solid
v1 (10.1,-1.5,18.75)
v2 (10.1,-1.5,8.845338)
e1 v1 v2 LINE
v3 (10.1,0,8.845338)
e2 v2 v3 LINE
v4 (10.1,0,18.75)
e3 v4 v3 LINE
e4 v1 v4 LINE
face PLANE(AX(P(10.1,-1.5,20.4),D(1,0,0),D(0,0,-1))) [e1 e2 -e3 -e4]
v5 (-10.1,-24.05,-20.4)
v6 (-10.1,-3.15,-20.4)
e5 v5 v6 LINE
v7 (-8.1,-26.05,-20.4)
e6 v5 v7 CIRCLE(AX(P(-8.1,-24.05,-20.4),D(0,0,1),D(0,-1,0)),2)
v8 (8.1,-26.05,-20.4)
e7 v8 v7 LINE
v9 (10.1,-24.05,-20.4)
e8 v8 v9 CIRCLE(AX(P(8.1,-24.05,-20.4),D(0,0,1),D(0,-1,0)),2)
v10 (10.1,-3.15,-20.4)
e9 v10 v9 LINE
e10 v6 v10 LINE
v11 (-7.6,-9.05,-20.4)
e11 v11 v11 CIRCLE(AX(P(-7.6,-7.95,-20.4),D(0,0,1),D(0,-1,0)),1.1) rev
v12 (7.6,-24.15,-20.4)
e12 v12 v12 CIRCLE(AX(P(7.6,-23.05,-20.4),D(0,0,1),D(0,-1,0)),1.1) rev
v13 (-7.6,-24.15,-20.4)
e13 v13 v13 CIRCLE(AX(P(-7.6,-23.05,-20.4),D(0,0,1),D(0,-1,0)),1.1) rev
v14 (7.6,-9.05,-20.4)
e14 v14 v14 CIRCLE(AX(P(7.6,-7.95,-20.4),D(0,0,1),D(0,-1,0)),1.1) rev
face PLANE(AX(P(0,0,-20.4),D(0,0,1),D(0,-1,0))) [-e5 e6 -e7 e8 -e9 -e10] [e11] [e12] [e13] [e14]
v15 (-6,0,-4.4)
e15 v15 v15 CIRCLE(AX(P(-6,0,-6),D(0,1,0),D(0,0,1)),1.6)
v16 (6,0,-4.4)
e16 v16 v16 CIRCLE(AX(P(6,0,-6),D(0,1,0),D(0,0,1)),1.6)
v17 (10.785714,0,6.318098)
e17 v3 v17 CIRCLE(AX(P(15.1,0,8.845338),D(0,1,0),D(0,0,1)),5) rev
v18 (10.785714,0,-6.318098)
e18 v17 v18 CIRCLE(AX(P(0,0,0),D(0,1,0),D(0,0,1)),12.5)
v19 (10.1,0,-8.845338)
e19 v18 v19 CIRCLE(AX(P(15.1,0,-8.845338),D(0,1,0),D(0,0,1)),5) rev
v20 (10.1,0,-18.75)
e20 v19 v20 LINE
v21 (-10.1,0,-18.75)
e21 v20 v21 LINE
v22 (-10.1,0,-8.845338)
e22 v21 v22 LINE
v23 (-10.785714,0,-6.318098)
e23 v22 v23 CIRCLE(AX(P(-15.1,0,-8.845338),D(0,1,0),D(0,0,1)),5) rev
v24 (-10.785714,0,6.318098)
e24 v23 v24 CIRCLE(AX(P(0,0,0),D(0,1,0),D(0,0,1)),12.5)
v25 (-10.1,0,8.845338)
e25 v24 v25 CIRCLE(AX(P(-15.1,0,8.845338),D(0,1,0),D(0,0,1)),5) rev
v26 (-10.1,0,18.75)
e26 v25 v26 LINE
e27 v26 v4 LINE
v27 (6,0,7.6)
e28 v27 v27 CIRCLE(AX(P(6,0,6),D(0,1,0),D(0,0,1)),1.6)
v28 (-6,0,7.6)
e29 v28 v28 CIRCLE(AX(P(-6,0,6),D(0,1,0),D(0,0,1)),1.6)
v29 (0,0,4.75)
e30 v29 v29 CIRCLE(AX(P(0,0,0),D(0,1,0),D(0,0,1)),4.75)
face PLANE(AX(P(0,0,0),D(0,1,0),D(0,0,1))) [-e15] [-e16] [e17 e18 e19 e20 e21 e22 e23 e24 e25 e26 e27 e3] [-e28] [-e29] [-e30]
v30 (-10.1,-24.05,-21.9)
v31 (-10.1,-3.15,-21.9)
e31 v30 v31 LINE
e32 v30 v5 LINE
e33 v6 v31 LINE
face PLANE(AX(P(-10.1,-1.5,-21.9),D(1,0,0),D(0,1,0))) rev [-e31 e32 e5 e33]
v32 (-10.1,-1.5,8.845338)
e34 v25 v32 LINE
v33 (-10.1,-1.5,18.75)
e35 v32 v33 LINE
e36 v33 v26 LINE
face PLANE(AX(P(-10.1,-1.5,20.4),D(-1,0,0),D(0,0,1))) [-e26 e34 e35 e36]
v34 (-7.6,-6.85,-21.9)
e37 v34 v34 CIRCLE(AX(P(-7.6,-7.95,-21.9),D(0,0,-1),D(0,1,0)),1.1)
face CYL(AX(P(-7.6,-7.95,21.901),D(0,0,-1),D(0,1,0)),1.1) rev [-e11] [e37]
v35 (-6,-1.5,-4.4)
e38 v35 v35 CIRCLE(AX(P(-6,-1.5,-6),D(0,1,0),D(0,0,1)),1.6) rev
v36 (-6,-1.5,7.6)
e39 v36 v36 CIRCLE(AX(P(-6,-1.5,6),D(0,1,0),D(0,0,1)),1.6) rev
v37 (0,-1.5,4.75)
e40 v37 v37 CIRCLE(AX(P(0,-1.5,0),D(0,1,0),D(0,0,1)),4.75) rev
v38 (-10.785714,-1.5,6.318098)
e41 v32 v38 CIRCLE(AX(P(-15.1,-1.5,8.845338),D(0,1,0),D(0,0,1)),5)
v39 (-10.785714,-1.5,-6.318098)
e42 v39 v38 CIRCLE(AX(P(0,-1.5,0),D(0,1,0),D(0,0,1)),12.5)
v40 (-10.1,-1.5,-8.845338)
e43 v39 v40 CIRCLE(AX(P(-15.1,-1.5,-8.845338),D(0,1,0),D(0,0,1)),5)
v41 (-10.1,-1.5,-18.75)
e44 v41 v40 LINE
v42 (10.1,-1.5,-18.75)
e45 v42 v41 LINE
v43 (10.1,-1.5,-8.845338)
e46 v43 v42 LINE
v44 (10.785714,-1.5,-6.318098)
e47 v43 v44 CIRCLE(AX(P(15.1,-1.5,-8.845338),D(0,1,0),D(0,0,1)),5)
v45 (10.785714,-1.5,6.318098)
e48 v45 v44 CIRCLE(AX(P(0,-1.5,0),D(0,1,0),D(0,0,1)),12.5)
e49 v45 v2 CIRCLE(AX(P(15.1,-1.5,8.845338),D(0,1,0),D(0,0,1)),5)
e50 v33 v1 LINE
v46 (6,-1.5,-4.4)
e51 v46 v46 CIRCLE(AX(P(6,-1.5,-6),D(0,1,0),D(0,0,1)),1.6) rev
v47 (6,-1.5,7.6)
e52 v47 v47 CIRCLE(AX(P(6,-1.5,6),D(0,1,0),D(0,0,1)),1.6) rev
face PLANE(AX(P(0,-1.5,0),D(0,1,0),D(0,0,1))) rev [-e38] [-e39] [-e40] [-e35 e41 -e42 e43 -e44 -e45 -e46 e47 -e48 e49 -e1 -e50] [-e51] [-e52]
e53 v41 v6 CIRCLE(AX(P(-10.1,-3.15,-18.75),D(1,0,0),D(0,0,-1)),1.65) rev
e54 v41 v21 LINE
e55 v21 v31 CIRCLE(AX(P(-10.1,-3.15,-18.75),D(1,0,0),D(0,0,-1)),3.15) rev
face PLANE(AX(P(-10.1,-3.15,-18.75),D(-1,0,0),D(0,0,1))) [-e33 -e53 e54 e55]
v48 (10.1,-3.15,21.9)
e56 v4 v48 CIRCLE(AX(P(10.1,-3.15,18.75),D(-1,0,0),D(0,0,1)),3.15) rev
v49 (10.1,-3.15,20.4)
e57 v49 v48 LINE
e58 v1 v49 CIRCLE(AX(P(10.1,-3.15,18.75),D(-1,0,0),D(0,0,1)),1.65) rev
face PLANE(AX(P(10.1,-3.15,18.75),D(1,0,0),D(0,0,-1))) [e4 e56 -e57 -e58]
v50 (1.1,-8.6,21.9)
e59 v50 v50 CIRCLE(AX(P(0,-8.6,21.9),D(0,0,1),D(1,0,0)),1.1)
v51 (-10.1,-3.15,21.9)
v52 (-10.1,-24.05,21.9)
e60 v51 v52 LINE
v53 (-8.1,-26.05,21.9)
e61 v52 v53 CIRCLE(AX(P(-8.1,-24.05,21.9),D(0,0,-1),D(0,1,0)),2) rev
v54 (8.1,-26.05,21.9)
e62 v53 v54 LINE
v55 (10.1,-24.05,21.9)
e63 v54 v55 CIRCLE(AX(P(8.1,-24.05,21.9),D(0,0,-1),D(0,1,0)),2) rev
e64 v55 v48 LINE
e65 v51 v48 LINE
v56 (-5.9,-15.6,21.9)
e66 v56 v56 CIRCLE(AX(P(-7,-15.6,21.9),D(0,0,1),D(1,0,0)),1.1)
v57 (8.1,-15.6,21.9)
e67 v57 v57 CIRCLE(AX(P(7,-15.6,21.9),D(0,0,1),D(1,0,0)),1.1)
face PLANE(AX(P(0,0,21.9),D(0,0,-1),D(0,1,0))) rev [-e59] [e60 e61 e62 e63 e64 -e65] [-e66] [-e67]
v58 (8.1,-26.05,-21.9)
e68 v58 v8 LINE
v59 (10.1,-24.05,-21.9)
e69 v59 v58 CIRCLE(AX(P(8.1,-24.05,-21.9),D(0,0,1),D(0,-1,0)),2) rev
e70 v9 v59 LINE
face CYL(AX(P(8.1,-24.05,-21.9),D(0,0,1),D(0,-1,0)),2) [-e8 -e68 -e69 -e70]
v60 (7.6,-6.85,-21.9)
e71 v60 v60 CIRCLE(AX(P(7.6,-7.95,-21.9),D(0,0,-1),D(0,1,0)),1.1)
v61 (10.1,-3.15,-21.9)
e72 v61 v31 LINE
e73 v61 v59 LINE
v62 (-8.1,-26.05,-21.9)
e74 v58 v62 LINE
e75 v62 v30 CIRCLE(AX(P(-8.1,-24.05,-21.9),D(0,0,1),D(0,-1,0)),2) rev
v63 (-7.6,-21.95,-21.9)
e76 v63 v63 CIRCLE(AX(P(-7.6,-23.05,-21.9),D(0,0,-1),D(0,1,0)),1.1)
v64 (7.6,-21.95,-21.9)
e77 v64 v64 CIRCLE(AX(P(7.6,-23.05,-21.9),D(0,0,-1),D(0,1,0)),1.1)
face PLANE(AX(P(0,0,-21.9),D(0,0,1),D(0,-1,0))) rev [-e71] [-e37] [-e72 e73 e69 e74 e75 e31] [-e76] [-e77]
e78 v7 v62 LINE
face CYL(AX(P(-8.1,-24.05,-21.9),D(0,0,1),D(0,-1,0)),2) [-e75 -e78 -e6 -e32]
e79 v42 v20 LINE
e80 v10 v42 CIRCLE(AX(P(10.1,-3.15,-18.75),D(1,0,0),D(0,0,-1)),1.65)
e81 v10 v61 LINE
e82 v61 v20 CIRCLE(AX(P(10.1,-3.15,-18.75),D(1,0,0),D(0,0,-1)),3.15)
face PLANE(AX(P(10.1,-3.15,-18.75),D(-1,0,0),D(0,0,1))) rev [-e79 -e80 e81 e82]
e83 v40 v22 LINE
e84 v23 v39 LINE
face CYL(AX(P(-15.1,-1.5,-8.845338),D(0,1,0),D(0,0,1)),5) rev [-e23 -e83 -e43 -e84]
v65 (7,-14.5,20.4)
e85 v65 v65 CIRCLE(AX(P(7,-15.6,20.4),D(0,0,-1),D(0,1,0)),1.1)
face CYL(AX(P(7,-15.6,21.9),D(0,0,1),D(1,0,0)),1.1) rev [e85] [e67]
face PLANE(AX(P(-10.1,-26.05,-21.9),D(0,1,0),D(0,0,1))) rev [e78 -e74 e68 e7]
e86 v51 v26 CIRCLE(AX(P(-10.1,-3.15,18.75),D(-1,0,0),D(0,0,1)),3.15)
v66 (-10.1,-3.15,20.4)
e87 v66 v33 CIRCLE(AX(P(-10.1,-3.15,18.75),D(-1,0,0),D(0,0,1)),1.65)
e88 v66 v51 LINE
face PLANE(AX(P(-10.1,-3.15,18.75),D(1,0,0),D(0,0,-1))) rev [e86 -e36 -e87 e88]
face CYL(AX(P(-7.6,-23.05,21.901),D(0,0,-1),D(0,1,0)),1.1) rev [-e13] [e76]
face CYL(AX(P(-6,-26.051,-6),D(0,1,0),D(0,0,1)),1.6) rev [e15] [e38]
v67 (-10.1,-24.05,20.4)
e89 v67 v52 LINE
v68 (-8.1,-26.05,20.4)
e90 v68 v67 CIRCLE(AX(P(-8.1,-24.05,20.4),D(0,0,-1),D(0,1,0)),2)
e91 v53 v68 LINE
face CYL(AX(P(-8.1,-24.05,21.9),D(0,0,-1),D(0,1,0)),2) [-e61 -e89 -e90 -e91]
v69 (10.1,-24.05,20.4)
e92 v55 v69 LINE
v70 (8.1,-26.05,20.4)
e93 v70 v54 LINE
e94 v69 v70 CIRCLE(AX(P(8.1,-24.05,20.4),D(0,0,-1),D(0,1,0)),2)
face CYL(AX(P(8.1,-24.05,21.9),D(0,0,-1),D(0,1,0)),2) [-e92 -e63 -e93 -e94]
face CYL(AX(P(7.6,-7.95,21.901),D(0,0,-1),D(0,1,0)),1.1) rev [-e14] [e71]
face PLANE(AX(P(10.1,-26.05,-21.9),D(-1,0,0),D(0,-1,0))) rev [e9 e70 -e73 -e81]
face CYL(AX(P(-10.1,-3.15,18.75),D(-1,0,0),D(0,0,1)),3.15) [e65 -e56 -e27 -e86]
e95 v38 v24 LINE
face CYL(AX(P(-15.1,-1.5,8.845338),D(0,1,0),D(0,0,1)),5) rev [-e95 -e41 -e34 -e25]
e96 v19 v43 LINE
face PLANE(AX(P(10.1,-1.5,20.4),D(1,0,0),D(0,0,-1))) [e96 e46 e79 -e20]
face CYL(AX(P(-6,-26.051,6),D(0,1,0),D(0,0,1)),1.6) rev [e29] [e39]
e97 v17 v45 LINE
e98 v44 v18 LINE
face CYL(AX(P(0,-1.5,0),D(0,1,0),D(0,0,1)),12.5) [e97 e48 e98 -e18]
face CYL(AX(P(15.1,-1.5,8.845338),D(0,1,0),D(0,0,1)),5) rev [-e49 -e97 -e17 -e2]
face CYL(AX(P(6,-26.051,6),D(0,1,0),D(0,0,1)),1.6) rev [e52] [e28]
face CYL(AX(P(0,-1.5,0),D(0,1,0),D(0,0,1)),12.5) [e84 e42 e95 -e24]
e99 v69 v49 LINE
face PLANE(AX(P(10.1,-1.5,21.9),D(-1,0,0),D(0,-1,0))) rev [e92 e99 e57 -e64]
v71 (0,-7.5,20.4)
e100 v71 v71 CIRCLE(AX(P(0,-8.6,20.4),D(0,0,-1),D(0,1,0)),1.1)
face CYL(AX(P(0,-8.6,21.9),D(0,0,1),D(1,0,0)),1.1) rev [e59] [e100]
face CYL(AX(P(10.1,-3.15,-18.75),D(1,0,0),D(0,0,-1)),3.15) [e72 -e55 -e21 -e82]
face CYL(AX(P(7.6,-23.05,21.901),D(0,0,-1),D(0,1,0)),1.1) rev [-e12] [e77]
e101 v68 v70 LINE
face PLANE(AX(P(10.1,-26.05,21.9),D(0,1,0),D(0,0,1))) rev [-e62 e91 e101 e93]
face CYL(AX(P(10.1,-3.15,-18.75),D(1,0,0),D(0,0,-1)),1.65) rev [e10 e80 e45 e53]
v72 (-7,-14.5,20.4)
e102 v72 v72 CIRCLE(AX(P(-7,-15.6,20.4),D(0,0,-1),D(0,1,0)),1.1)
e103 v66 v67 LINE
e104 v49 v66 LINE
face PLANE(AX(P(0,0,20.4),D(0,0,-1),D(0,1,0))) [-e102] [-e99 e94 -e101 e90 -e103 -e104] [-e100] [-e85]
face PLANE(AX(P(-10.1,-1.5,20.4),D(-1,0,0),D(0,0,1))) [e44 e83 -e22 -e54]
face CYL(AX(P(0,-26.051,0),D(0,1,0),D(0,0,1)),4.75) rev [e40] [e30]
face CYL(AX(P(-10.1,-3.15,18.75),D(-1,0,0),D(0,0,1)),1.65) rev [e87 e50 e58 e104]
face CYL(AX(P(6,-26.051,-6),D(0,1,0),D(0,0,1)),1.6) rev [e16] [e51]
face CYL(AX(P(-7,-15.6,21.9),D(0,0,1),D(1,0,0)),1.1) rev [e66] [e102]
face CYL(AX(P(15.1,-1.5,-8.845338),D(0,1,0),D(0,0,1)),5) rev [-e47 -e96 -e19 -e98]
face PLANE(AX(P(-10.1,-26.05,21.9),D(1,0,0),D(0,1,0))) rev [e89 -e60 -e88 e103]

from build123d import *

# Parameters (mm, degrees)
SKETCH1_W                      = 20.2
SKETCH1_H                      = 40.8
BASE_FLANGE1_DEPTH             = 1.5
EDGE_FLANGE1_STRIP_W           = 9.3
EDGE_FLANGE1_STRIP_H           = 1.5
EDGE_FLANGE1_STRIP_CUT_DEPTH   = 20.2
EDGE_FLANGE1_STRIP_2_W         = 9.3
EDGE_FLANGE1_STRIP_2_H         = 1.5
EDGE_FLANGE1_STRIP_CUT_2_DEPTH = 20.2
EDGE_FLANGE1_DEPTH             = 20.2
EDGE_FLANGE1_BEND_DEPTH        = 20.2
CUT_EXTRUDE1_REACH             = 53.952
SKETCH12_R                     = 1.1
FILLET1_R                      = 2
F_2_0MM_DOWEL_HOLE1_D          = 2.2
F_2_0MM_DOWEL_HOLE1_DEPTH      = 1.5
SKETCH15_R                     = 12.5
TAB1_DEPTH                     = 1.5
FILLET2_R                      = 5
CUT_EXTRUDE2_REACH             = 38.256
SKETCH18_R                     = 1.6
SKETCH18_R_2                   = 4.75


# Sheet-metal steps are written as plain solids
with BuildPart() as part:
    # Sketch1 → Base-Flange1 (new body)
    with BuildSketch(Plane(origin=(0, 0, 0), x_dir=(1, 0, 0), z_dir=(0, 1, 0))):
        Rectangle(SKETCH1_W, SKETCH1_H)
    extrude(amount=-BASE_FLANGE1_DEPTH)

    # Edge-Flange1 strip (across the edge) → Edge-Flange1 strip cut (cut)
    with BuildSketch(Plane(origin=(10.1, -1.5, 20.4), x_dir=(0, 0, -1), z_dir=(-1, 0, 0))):
        with Locations((-3, -0.75)):
            Rectangle(EDGE_FLANGE1_STRIP_W, EDGE_FLANGE1_STRIP_H)
    extrude(amount=EDGE_FLANGE1_STRIP_CUT_DEPTH, mode=Mode.SUBTRACT)

    # Edge-Flange1 strip 2 (across the edge) → Edge-Flange1 strip cut 2 (cut)
    with BuildSketch(Plane(origin=(-10.1, -1.5, -20.4), x_dir=(0, 0, 1), z_dir=(1, 0, 0))):
        with Locations((-3, -0.75)):
            Rectangle(EDGE_FLANGE1_STRIP_2_W, EDGE_FLANGE1_STRIP_2_H)
    extrude(amount=EDGE_FLANGE1_STRIP_CUT_2_DEPTH, mode=Mode.SUBTRACT)

    # Edge-Flange1 section (across the edge) → Edge-Flange1 (add)
    with BuildSketch(Plane(origin=(10.1, -1.5, 20.4), x_dir=(0, 0, -1), z_dir=(-1, 0, 0))):
        with BuildLine():
            Line((-1.5, 1.65), (-1.5, 24.55))
            Line((-1.5, 24.55), (0, 24.55))
            Line((0, 24.55), (0, 1.65))
            ThreePointArc((0, 1.65), (0.483273811, 0.483273811), (1.65, 0))
            Line((1.65, 0), (1.65, -1.5))
            ThreePointArc((1.65, -1.5), (-0.577386361, -0.577386361), (-1.5, 1.65))
        make_face()
    extrude(amount=EDGE_FLANGE1_DEPTH)

    # Edge-Flange1 section 2 (across the edge) → Edge-Flange1 bend (add)
    with BuildSketch(Plane(origin=(-10.1, -1.5, -20.4), x_dir=(0, 0, 1), z_dir=(1, 0, 0))):
        with BuildLine():
            Line((-1.5, 1.65), (-1.5, 24.55))
            Line((-1.5, 24.55), (0, 24.55))
            Line((0, 24.55), (0, 1.65))
            ThreePointArc((0, 1.65), (0.483273811, 0.483273811), (1.65, 0))
            Line((1.65, 0), (1.65, -1.5))
            ThreePointArc((1.65, -1.5), (-0.577386361, -0.577386361), (-1.5, 1.65))
        make_face()
    extrude(amount=EDGE_FLANGE1_BEND_DEPTH)

    # Sketch12 → Cut-Extrude1 (cut, up to next)
    with BuildSketch(Plane(origin=(0, 0, -21.9), x_dir=(-1, 0, 0), z_dir=(0, 0, -1)), mode=Mode.PRIVATE) as cut_extrude1_sk1:
        with Locations(Location((-7.6, -7.95, 0), (0, 0, 90))):
            Circle(SKETCH12_R)
    cut_extrude1_tool1 = extrude(cut_extrude1_sk1.sketch, amount=-CUT_EXTRUDE1_REACH, mode=Mode.PRIVATE) & part.part
    # Sketch12 → Cut-Extrude1 (cut, up to next)
    with BuildSketch(Plane(origin=(0, 0, -21.9), x_dir=(-1, 0, 0), z_dir=(0, 0, -1)), mode=Mode.PRIVATE) as cut_extrude1_sk2:
        with Locations(Location((7.6, -7.95, 0), (0, 0, 90))):
            Circle(SKETCH12_R)
    cut_extrude1_tool2 = extrude(cut_extrude1_sk2.sketch, amount=-CUT_EXTRUDE1_REACH, mode=Mode.PRIVATE) & part.part
    # Sketch12 → Cut-Extrude1 (cut, up to next)
    with BuildSketch(Plane(origin=(0, 0, -21.9), x_dir=(-1, 0, 0), z_dir=(0, 0, -1)), mode=Mode.PRIVATE) as cut_extrude1_sk3:
        with Locations(Location((7.6, -23.05, 0), (0, 0, 90))):
            Circle(SKETCH12_R)
    cut_extrude1_tool3 = extrude(cut_extrude1_sk3.sketch, amount=-CUT_EXTRUDE1_REACH, mode=Mode.PRIVATE) & part.part
    # Sketch12 → Cut-Extrude1 (cut, up to next)
    with BuildSketch(Plane(origin=(0, 0, -21.9), x_dir=(-1, 0, 0), z_dir=(0, 0, -1)), mode=Mode.PRIVATE) as cut_extrude1_sk4:
        with Locations(Location((-7.6, -23.05, 0), (0, 0, 90))):
            Circle(SKETCH12_R)
    cut_extrude1_tool4 = extrude(cut_extrude1_sk4.sketch, amount=-CUT_EXTRUDE1_REACH, mode=Mode.PRIVATE) & part.part
    add(cut_extrude1_tool1.solids().sort_by_distance((7.6, -7.95, -21.9))[0], mode=Mode.SUBTRACT)
    add(cut_extrude1_tool2.solids().sort_by_distance((-7.6, -7.95, -21.9))[0], mode=Mode.SUBTRACT)
    add(cut_extrude1_tool3.solids().sort_by_distance((-7.6, -23.05, -21.9))[0], mode=Mode.SUBTRACT)
    add(cut_extrude1_tool4.solids().sort_by_distance((7.6, -23.05, -21.9))[0], mode=Mode.SUBTRACT)

    # Fillet1
    fillet1_edges = [part.edges().sort_by_distance(p)[0] for p in [
        (10.1, -26.05, 21.15),
        (-10.1, -26.05, 21.15),
        (-10.1, -26.05, -21.15),
        (10.1, -26.05, -21.15),
    ]]
    fillet(fillet1_edges, radius=FILLET1_R)

    # Ø2.0mm Dowel Hole1
    with Locations(Plane.XY.offset(21.9)):
        with Locations((-7, -15.6), (0, -8.6), (7, -15.6)):
            Hole(F_2_0MM_DOWEL_HOLE1_D / 2, depth=F_2_0MM_DOWEL_HOLE1_DEPTH)

    # Sketch15 → Tab1 (add)
    with BuildSketch(Plane(origin=(0, 0, 0), x_dir=(1, 0, 0), z_dir=(0, 1, 0))):
        Circle(SKETCH15_R)
    extrude(amount=-TAB1_DEPTH)

    # Fillet2
    fillet2_edges = [part.edges().sort_by_distance(p)[0] for p in [
        (-10.1, -0.75, -7.364781056),
        (-10.1, -0.75, 7.364781056),
        (10.1, -0.75, -7.364781056),
        (10.1, -0.75, 7.364781056),
    ]]
    fillet(fillet2_edges, radius=FILLET2_R)

    # Sketch18 → Cut-Extrude2 (cut, up to next)
    with BuildSketch(Plane(origin=(0, 0, 0), x_dir=(1, 0, 0), z_dir=(0, 1, 0)), mode=Mode.PRIVATE) as cut_extrude2_sk1:
        with Locations(Location((-6, 6, 0), (0, 0, 270))):
            Circle(SKETCH18_R)
    cut_extrude2_tool1 = extrude(cut_extrude2_sk1.sketch, amount=-CUT_EXTRUDE2_REACH, mode=Mode.PRIVATE) & part.part
    # Sketch18 → Cut-Extrude2 (cut, up to next)
    with BuildSketch(Plane(origin=(0, 0, 0), x_dir=(1, 0, 0), z_dir=(0, 1, 0)), mode=Mode.PRIVATE) as cut_extrude2_sk2:
        with Locations(Location((6, 6, 0), (0, 0, 270))):
            Circle(SKETCH18_R)
    cut_extrude2_tool2 = extrude(cut_extrude2_sk2.sketch, amount=-CUT_EXTRUDE2_REACH, mode=Mode.PRIVATE) & part.part
    # Sketch18 → Cut-Extrude2 (cut, up to next)
    with BuildSketch(Plane(origin=(0, 0, 0), x_dir=(1, 0, 0), z_dir=(0, 1, 0)), mode=Mode.PRIVATE) as cut_extrude2_sk3:
        with Locations(Location((-6, -6, 0), (0, 0, 270))):
            Circle(SKETCH18_R)
    cut_extrude2_tool3 = extrude(cut_extrude2_sk3.sketch, amount=-CUT_EXTRUDE2_REACH, mode=Mode.PRIVATE) & part.part
    # Sketch18 → Cut-Extrude2 (cut, up to next)
    with BuildSketch(Plane(origin=(0, 0, 0), x_dir=(1, 0, 0), z_dir=(0, 1, 0)), mode=Mode.PRIVATE) as cut_extrude2_sk4:
        with Locations(Location((6, -6, 0), (0, 0, 270))):
            Circle(SKETCH18_R)
    cut_extrude2_tool4 = extrude(cut_extrude2_sk4.sketch, amount=-CUT_EXTRUDE2_REACH, mode=Mode.PRIVATE) & part.part
    # Sketch18 → Cut-Extrude2 (cut, up to next)
    with BuildSketch(Plane(origin=(0, 0, 0), x_dir=(1, 0, 0), z_dir=(0, 1, 0)), mode=Mode.PRIVATE) as cut_extrude2_sk5:
        with Locations(Location((0, 0, 0), (0, 0, 270))):
            Circle(SKETCH18_R_2)
    cut_extrude2_tool5 = extrude(cut_extrude2_sk5.sketch, amount=-CUT_EXTRUDE2_REACH, mode=Mode.PRIVATE) & part.part
    add(cut_extrude2_tool1.solids().sort_by_distance((-6, 0, -6))[0], mode=Mode.SUBTRACT)
    add(cut_extrude2_tool2.solids().sort_by_distance((6, 0, -6))[0], mode=Mode.SUBTRACT)
    add(cut_extrude2_tool3.solids().sort_by_distance((-6, 0, 6))[0], mode=Mode.SUBTRACT)
    add(cut_extrude2_tool4.solids().sort_by_distance((6, 0, 6))[0], mode=Mode.SUBTRACT)
    add(cut_extrude2_tool5.solids().sort_by_distance((0, 0, 0))[0], mode=Mode.SUBTRACT)


solid = part.part
